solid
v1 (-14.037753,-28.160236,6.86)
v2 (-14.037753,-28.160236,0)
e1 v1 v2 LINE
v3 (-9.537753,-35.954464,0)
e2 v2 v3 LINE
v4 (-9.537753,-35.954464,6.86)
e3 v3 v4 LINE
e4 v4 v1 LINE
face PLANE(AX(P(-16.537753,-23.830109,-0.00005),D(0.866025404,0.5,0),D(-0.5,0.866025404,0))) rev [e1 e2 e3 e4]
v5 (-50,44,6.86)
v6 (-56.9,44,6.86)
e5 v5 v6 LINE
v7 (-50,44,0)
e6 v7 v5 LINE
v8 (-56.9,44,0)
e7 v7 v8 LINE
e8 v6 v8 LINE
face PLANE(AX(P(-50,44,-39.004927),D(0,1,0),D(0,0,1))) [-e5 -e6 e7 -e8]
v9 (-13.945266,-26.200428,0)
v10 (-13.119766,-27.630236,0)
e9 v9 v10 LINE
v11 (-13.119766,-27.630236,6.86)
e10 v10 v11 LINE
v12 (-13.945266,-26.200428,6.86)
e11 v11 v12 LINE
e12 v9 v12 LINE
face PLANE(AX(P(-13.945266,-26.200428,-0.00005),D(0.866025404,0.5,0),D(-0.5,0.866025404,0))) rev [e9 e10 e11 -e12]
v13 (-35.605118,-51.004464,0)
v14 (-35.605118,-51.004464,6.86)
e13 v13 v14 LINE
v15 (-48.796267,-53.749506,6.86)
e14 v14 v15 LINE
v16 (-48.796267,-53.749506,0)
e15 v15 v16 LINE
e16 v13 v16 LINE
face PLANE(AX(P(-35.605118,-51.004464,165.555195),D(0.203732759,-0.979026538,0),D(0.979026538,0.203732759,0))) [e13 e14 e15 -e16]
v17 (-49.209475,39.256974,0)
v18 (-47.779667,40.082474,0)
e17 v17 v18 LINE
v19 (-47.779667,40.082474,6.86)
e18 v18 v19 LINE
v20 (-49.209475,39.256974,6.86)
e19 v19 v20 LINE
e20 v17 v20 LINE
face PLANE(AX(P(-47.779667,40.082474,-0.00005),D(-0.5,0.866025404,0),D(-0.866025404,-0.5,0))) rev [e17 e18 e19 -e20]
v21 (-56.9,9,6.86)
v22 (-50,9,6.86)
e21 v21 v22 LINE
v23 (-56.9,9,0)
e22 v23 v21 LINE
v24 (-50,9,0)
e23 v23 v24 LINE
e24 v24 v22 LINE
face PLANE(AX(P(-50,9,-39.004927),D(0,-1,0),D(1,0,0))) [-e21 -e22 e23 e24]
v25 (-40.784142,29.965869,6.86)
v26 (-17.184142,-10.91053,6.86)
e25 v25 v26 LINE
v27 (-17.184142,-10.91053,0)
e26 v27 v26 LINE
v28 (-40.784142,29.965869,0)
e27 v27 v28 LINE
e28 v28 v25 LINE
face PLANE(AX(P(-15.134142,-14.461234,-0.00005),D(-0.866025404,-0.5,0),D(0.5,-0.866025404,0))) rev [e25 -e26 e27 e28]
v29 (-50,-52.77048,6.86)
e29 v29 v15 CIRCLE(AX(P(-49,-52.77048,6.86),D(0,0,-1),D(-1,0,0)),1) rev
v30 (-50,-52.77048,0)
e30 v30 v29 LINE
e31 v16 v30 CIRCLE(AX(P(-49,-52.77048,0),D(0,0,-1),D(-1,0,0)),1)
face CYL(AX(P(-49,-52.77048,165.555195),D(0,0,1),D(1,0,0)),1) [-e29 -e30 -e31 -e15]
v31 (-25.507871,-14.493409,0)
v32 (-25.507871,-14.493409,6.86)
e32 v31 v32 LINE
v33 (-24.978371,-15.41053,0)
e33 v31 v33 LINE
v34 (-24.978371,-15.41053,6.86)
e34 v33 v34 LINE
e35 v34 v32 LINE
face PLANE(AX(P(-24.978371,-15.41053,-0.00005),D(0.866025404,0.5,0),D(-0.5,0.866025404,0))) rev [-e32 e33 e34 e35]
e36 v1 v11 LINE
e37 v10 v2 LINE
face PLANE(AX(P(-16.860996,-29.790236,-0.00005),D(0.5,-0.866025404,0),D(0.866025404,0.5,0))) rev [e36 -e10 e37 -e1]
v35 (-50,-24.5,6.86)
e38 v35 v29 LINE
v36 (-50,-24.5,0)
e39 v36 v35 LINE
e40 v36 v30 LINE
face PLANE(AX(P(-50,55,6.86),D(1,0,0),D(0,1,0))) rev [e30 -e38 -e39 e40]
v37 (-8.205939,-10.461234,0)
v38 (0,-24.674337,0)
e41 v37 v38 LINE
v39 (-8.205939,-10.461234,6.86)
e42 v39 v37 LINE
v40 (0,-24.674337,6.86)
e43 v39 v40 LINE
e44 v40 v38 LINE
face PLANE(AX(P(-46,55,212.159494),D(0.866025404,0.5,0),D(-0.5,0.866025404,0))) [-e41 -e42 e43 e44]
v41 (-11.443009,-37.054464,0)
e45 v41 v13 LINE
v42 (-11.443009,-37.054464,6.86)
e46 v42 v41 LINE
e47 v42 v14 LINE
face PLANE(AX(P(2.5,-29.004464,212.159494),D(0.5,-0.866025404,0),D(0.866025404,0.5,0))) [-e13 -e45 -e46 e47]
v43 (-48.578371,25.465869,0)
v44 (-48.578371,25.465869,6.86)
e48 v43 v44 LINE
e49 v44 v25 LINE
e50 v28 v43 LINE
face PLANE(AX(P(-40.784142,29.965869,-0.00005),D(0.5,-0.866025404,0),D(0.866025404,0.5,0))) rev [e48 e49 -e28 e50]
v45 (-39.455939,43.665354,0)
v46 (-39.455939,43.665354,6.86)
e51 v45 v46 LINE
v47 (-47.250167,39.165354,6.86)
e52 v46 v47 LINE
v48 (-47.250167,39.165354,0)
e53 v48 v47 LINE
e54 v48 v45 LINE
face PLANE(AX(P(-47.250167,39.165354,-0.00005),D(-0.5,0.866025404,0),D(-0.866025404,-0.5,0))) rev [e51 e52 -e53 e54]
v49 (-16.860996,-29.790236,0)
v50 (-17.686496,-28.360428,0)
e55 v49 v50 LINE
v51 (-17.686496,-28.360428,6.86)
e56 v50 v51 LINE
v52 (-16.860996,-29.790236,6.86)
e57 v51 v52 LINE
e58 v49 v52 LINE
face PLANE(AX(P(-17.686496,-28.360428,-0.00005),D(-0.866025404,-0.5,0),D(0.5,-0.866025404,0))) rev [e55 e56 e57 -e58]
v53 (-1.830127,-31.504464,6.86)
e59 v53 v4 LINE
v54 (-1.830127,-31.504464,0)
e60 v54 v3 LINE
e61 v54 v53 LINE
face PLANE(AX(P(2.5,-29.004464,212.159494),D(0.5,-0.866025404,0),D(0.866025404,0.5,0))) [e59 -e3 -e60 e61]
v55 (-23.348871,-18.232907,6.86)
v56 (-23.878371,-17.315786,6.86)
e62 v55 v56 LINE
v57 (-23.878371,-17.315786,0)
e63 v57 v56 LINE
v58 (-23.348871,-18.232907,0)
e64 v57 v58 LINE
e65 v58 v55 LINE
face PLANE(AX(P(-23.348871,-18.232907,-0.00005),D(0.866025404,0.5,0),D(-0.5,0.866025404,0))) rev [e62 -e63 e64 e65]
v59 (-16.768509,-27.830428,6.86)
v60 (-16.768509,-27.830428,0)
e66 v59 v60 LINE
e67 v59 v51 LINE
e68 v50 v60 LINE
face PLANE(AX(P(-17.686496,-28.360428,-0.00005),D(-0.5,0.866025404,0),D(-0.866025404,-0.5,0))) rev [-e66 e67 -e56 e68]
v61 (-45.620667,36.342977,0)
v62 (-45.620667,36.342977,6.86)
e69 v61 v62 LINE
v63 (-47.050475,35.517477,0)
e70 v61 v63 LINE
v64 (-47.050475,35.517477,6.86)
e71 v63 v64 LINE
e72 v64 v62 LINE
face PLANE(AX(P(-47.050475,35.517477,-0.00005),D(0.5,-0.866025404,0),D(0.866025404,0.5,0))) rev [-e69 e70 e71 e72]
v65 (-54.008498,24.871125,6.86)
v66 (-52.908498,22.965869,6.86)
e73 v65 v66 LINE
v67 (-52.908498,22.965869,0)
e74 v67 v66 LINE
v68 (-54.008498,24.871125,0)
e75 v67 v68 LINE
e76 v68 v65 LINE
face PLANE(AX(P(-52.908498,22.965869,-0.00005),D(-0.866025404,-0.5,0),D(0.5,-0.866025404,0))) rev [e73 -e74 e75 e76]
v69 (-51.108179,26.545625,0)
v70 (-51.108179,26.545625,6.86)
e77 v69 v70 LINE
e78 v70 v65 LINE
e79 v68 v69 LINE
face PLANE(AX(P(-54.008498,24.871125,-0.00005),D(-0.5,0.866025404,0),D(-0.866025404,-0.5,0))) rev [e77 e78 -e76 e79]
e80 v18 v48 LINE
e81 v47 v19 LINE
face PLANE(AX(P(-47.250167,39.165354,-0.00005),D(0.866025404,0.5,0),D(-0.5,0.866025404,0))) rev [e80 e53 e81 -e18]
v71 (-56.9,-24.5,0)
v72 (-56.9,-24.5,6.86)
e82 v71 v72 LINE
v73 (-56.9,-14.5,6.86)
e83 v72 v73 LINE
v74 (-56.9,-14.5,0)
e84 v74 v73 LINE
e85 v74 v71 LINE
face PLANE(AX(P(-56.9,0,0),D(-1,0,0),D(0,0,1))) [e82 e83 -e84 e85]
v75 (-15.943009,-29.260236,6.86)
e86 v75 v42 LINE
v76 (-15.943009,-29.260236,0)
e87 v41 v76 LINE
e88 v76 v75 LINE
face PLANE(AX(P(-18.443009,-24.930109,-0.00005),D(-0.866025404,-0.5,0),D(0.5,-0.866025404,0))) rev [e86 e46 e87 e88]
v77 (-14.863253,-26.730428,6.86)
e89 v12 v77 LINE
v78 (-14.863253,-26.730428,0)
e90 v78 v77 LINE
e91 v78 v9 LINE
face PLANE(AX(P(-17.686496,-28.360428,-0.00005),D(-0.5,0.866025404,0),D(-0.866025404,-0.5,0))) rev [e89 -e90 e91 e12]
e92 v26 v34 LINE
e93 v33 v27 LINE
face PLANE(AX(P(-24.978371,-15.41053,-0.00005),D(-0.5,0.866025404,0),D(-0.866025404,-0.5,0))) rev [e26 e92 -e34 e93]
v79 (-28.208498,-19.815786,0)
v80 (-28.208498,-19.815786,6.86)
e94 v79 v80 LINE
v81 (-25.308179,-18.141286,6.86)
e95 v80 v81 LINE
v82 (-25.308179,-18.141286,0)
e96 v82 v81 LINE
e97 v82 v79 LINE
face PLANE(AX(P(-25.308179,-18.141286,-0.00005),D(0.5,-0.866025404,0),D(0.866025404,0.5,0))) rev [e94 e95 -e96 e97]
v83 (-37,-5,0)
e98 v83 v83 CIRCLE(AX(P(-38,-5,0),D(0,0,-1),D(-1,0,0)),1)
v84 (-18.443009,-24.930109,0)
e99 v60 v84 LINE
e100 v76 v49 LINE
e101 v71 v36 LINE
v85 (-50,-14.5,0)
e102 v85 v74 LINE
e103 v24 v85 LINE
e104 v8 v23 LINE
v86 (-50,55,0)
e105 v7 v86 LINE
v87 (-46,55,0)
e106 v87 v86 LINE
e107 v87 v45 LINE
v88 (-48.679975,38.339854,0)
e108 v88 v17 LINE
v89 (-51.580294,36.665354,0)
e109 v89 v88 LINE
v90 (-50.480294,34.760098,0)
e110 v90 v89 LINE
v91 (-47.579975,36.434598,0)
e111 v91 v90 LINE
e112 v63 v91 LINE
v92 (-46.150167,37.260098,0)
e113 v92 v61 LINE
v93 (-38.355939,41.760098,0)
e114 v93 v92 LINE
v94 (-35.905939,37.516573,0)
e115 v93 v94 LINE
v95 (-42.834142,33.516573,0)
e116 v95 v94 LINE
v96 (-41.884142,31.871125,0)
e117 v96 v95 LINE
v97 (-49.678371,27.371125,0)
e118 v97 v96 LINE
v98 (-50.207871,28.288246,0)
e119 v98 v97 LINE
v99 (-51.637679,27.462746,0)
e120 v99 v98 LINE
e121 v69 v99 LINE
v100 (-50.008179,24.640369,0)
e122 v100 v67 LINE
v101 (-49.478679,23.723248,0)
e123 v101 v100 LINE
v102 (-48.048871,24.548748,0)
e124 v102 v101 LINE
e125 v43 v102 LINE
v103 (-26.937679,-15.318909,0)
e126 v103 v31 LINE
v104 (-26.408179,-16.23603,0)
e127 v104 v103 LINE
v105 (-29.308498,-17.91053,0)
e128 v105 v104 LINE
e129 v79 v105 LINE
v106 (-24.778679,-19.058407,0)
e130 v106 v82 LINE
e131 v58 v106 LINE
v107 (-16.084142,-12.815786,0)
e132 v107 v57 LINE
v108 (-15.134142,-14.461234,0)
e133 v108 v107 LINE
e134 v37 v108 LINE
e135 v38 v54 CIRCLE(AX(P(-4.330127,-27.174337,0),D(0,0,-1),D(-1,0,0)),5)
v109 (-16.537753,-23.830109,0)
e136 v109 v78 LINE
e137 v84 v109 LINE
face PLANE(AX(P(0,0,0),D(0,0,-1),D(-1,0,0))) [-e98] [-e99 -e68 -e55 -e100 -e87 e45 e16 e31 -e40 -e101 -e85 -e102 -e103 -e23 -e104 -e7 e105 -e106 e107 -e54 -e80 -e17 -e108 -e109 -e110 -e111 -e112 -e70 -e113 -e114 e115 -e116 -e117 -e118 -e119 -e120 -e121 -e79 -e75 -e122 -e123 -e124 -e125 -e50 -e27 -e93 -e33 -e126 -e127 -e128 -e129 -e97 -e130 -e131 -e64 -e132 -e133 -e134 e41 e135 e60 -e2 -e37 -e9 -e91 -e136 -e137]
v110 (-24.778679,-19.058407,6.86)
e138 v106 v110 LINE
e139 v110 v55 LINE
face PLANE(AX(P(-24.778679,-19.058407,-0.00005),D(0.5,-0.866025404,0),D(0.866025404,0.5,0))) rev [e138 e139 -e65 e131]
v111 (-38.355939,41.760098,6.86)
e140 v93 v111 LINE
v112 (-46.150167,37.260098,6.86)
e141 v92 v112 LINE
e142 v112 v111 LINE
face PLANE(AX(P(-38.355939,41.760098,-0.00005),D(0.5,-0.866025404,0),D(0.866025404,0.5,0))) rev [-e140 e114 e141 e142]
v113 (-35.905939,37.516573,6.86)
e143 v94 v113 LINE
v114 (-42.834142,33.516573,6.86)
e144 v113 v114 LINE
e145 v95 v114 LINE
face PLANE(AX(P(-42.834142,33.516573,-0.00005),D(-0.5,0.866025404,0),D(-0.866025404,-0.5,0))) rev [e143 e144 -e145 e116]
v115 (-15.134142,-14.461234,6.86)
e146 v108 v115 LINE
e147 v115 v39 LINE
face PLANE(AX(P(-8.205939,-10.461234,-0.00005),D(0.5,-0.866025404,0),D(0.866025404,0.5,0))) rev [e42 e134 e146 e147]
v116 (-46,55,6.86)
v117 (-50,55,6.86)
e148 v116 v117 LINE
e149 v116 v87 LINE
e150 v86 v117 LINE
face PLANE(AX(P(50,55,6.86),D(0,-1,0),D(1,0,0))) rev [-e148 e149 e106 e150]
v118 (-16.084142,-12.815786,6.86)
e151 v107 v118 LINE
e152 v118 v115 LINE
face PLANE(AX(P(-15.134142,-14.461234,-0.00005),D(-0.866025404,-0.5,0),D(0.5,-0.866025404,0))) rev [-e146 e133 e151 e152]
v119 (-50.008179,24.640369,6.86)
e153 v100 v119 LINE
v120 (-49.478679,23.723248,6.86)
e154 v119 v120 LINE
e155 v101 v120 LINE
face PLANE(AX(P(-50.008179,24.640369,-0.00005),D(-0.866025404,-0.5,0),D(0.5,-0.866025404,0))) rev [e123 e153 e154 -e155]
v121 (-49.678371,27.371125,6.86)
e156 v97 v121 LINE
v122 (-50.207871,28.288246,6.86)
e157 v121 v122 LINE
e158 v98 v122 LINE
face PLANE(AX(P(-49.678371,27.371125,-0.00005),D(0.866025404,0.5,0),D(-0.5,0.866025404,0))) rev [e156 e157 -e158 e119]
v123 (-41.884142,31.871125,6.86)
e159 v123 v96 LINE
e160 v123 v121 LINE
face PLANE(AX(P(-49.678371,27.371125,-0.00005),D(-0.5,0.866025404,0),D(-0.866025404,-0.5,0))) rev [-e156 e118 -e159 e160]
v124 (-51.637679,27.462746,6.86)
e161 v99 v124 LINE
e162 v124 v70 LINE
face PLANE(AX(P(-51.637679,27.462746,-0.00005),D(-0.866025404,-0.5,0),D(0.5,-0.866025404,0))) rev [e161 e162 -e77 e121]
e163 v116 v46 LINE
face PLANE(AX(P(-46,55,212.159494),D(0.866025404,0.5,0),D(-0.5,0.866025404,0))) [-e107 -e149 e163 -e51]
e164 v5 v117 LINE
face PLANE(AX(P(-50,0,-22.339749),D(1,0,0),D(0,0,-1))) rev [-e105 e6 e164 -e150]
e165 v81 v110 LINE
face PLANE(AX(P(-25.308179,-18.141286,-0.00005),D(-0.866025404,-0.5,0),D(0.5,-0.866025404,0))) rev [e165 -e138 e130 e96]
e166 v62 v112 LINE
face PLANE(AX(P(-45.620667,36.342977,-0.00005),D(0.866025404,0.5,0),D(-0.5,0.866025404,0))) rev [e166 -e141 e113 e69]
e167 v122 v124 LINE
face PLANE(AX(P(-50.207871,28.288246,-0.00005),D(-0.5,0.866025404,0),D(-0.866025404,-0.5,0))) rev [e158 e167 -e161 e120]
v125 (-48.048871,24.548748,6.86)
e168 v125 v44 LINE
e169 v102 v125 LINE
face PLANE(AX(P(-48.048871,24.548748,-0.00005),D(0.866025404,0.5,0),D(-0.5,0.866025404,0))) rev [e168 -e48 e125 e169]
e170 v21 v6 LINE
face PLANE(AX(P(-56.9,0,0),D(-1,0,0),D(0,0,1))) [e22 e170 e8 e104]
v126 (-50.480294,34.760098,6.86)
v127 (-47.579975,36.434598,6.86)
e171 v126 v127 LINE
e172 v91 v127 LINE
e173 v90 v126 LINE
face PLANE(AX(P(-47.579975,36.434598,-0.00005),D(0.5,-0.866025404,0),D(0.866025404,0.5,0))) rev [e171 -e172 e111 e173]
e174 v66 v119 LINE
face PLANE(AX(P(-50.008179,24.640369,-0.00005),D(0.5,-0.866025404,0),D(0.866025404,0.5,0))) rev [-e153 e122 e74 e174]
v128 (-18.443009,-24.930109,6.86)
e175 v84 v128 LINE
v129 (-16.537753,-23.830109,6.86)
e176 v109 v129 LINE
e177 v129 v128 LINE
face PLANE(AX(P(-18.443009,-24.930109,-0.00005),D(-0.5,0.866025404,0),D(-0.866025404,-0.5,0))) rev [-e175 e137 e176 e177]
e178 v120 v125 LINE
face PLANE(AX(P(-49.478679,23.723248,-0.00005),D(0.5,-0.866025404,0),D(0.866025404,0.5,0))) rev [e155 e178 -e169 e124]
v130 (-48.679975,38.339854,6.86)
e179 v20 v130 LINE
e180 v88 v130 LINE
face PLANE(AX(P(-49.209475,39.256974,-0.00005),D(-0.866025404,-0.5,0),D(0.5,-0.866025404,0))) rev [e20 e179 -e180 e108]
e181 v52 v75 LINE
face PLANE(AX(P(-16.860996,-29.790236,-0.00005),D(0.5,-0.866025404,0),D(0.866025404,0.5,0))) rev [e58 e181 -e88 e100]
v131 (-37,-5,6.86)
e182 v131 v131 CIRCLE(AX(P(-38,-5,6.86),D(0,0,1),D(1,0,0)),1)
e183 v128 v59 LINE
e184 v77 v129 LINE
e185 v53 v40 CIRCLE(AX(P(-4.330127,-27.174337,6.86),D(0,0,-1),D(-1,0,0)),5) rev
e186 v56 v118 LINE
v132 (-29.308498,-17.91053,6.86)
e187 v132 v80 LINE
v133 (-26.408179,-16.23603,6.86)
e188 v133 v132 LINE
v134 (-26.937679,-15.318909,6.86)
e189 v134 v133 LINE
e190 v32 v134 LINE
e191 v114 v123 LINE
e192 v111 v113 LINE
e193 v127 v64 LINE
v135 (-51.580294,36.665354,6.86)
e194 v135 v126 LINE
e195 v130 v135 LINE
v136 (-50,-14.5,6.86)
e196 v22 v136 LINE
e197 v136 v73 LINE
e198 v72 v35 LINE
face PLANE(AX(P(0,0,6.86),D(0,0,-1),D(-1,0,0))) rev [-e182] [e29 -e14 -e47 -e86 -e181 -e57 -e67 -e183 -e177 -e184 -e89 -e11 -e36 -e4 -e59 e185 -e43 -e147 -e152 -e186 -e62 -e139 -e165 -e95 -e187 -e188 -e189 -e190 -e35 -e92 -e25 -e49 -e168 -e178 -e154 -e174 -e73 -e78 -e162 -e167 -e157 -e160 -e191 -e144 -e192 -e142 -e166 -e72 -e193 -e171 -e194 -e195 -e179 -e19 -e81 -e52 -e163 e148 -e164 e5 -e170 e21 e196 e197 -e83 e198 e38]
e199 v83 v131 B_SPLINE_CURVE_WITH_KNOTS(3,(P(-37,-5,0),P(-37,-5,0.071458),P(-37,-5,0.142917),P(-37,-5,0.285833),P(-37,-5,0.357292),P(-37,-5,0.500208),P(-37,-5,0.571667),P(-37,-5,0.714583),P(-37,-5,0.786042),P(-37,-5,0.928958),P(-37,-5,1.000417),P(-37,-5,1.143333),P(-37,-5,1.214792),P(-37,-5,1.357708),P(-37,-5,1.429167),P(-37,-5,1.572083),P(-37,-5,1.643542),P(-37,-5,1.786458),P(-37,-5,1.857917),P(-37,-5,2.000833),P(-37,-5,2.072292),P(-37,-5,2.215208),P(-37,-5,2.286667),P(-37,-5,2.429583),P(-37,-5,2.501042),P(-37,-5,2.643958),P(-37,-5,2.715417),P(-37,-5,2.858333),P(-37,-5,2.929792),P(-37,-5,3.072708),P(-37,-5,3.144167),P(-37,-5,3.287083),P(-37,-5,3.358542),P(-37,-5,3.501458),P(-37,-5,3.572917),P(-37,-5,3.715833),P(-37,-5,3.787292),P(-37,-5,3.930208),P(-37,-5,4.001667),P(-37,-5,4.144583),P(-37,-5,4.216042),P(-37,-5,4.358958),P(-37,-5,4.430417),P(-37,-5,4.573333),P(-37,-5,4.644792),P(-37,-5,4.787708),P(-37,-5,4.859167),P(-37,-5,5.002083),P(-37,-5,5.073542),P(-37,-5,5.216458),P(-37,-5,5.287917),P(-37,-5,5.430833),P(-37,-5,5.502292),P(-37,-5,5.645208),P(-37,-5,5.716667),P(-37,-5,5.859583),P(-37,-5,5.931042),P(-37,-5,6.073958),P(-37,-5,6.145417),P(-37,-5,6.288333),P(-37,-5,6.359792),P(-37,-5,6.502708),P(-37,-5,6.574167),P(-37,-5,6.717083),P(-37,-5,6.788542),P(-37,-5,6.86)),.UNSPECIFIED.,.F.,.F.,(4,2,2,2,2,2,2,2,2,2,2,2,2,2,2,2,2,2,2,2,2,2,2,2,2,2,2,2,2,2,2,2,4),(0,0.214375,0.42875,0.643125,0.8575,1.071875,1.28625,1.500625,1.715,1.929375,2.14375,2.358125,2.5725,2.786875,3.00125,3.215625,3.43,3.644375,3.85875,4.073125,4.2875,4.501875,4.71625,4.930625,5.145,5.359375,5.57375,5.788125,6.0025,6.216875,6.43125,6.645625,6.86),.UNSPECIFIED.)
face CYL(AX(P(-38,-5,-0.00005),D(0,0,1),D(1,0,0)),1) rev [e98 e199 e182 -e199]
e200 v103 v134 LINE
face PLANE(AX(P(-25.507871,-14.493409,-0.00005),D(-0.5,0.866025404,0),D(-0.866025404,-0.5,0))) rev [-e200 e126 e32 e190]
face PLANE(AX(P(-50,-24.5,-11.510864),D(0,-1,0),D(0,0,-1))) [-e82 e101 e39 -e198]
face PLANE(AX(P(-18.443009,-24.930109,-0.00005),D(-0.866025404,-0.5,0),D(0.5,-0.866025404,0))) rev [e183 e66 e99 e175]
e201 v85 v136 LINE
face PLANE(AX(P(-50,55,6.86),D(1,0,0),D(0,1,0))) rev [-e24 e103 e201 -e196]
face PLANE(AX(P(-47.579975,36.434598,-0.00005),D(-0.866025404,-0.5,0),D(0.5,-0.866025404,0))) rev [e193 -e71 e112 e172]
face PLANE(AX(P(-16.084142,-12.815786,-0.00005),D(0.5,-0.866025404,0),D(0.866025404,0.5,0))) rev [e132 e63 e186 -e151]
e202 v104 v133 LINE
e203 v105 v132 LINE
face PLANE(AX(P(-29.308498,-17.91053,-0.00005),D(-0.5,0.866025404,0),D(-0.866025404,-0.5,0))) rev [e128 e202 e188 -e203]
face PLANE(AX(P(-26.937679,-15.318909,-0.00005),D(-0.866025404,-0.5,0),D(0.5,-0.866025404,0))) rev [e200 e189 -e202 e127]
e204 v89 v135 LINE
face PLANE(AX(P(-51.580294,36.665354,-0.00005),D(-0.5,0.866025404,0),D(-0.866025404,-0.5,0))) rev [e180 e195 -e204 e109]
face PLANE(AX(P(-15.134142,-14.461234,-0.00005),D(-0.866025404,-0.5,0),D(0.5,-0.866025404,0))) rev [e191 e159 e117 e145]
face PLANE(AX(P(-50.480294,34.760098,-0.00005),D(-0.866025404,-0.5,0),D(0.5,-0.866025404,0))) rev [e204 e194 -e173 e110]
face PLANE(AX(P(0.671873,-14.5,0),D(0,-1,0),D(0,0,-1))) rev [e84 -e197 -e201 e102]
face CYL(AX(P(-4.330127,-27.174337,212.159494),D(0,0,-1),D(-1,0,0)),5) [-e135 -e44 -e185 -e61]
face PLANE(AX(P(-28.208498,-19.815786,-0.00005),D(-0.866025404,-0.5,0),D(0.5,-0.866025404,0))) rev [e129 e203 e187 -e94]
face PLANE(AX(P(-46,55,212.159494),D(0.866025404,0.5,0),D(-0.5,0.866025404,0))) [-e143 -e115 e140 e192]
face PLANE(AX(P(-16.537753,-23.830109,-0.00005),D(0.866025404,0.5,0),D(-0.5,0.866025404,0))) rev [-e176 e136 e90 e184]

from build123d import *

# Parameters (mm, degrees)
SKETCH1_W                = 100
SKETCH1_H                = 110
BOSS_EXTRUDE1_DEPTH      = 6.86
BOSS_EXTRUDE2_DEPTH      = 6.86
CUT_EXTRUDE1_DEPTH       = 84.419927529
CUT_EXTRUDE1_DEPTH_BACK  = 84.419927529
CUT_EXTRUDE5_DEPTH       = 84.419927529
CUT_EXTRUDE6_DEPTH       = 84.419927529
SKETCH7_W                = 42
SKETCH7_H                = 3.55
CUT_EXTRUDE7_DEPTH       = 84.419927529
SKETCH8_W                = 5
SKETCH8_H                = 7.62
CUT_EXTRUDE8_DEPTH       = 84.419927529
CUT_EXTRUDE9_DEPTH       = 84.419927529
LPATTERN1_COUNT          = 2
LPATTERN1_PITCH          = 49.4
SKETCH15_W               = 6.5
SKETCH15_H               = 9.5
BOSS_EXTRUDE3_DEPTH      = 6.86
CUT_EXTRUDE14_START      = -6.86
CUT_EXTRUDE14_DEPTH      = 6.86
BOSS_EXTRUDE4_DEPTH      = 6.86
FILLET3_R                = 5
FILLET4_R                = 7
CUT_EXTRUDE11_DEPTH      = 84.419927529
BOSS_EXTRUDE5_DEPTH      = 6.86
BOSS_EXTRUDE6_DEPTH      = 6.86
CUT_EXTRUDE12_DEPTH      = 84.419927529
CUT_EXTRUDE12_DEPTH_BACK = 84.419927529
SKETCH22_R               = 1
CUT_EXTRUDE13_DEPTH      = 84.419927529
CUT_EXTRUDE15_DEPTH      = 84.419927529
CUT_EXTRUDE15_DEPTH_BACK = 84.419927529
CUT_EXTRUDE16_DEPTH      = 84.419927529
CUT_EXTRUDE16_DEPTH_BACK = 84.419927529
FILLET2_R                = 1
BOSS_EXTRUDE8_START      = -6.86
BOSS_EXTRUDE8_DEPTH      = 6.86
CUT_EXTRUDE19_START      = -10
CUT_EXTRUDE19_DEPTH      = 10
SKETCH28_W               = 6.86
SKETCH28_H               = 9.5
SKETCH28_H_2             = 35
BOSS_EXTRUDE9_DEPTH      = 0.4
BOSS_EXTRUDE10_REACH     = 81.915
SKETCH29_W               = 6.86
SKETCH29_H               = 0.5
BOSS_EXTRUDE11_DEPTH     = 6.86


# Read off the part's stored shape, not the designer's step: Cut-Extrude14
with BuildPart() as part:
    # Sketch1 → Boss-Extrude1 (new body)
    with BuildSketch(Plane.XY):
        Rectangle(SKETCH1_W, SKETCH1_H)
    extrude(amount=BOSS_EXTRUDE1_DEPTH)

    # Sketch14 → Boss-Extrude2 (add)
    with BuildSketch(Plane.XY.offset(6.86)):
        with BuildLine():
            Line((-50, 44), (-56.9, 44))
            Line((-56.9, 44), (-57.252653961, 46))
            Line((-57.252653961, 46), (-60.252653961, 46))
            ThreePointArc((-60.252653961, 46), (-62.140394827, 27.177051725), (-56.9, 9))
            Line((-56.9, 9), (-50, 9))
            Line((-50, 9), (-50, 44))
        make_face()
    extrude(amount=-BOSS_EXTRUDE2_DEPTH)

    # Sketch9 → Cut-Extrude1 (cut, two sides: drawn at the far end of the back side and taken through both)
    with BuildSketch(Plane.XY.offset(6.86).offset(-CUT_EXTRUDE1_DEPTH_BACK)):
        Polygon((-202.691345573, 326.397371639), (-46, 55), (2.5, -29.004464167), (-49.825975731, -59.214880341), (-321.22334737, -215.906225914), (291.08659924, -349.739606366), (409.618601037, 192.563991188), align=None)
    extrude(amount=CUT_EXTRUDE1_DEPTH + CUT_EXTRUDE1_DEPTH_BACK, mode=Mode.SUBTRACT)

    # Sketch11 → Cut-Extrude5 (cut, through all)
    with BuildSketch(Plane.XY.offset(6.86)):
        Polygon((-35.90593882, 37.516573181), (-8.20593882, -10.461234188), (-15.13414205, -14.461234188), (-42.83414205, 33.516573181), align=None)
    extrude(amount=-CUT_EXTRUDE5_DEPTH, mode=Mode.SUBTRACT)

    # Sketch12 → Cut-Extrude6 (cut, through all)
    with BuildSketch(Plane.XY.offset(6.86)):
        Polygon((-18.88414205, -7.96604366), (-21.534179786, -9.49604366), (-35.534179786, 14.752667646), (-32.88414205, 16.282667646), align=None)
    extrude(amount=-CUT_EXTRUDE6_DEPTH, mode=Mode.SUBTRACT)

    # Sketch7 → Cut-Extrude7 (cut, through all)
    with BuildSketch(Plane.XY.offset(6.86)):
        with Locations((-50, -34)):
            Rectangle(SKETCH7_W, SKETCH7_H)
    extrude(amount=-CUT_EXTRUDE7_DEPTH, mode=Mode.SUBTRACT)

    # Sketch8 → Cut-Extrude8 (cut, through all)
    with BuildSketch(Plane.XY.offset(6.86)):
        with Locations((-36.5, -34)):
            Rectangle(SKETCH8_W, SKETCH8_H)
    extrude(amount=-CUT_EXTRUDE8_DEPTH, mode=Mode.SUBTRACT)

    # Sketch13 → Cut-Extrude9 (cut, through all)
    with BuildSketch(Plane.XY.offset(6.86)):
        Polygon((-41.88414205, 31.871124914), (-40.78414205, 29.965869026), (-48.578370684, 25.465869026), (-48.048870684, 24.548748123), (-49.478678626, 23.723248123), (-50.008178626, 24.640369026), (-52.908497703, 22.965869026), (-54.008497703, 24.871124914), (-51.108178626, 26.545624914), (-51.637678626, 27.462745817), (-50.207870684, 28.288245817), (-49.678370684, 27.371124914), align=None)
        Polygon((-39.45593882, 43.665353548), (-38.35593882, 41.76009766), (-46.150167454, 37.26009766), (-45.620667454, 36.342976757), (-47.050475396, 35.517476757), (-47.579975396, 36.43459766), (-50.480294473, 34.76009766), (-51.580294473, 36.665353548), (-48.679975396, 38.339853548), (-49.209475396, 39.256974451), (-47.779667454, 40.082474451), (-47.250167454, 39.165353548), align=None)
        Polygon((-18.443009001, -24.930108514), (-11.443009001, -37.054464167), (-9.537753113, -35.954464167), (-16.537753113, -23.830108514), align=None)
    cut_extrude9 = extrude(amount=-CUT_EXTRUDE9_DEPTH, mode=Mode.SUBTRACT)

    # LPattern1: Cut-Extrude9 ×2
    with Locations(*[Vector(0.49999999999999345, -0.8660254037844425, 0) * (i * LPATTERN1_PITCH) for i in range(1, LPATTERN1_COUNT)]):
        add(cut_extrude9, mode=Mode.SUBTRACT)

    # Sketch15 → Boss-Extrude3 (add)
    with BuildSketch(Plane.XY.offset(6.86)):
        with Locations((-53.25, -19.75)):
            Rectangle(SKETCH15_W, SKETCH15_H)
    extrude(amount=-BOSS_EXTRUDE3_DEPTH)

    # Cut-Extrude14 outline → Cut-Extrude14 (cut)
    with BuildSketch(Plane.XY.offset(6.86).offset(CUT_EXTRUDE14_START)):
        Polygon((-56.5, -15), (-56.5, -16.500643242), (-50, -15), align=None)
    extrude(amount=CUT_EXTRUDE14_DEPTH, mode=Mode.SUBTRACT)

    # Sketch16 → Boss-Extrude4 (add)
    with BuildSketch(Plane.XY.offset(6.86)):
        Polygon((-35.605117767, -51.004464167), (-34.105117767, -53.602540378), (-36.525588833, -55), (-42.525588833, -55), (-44.558274136, -51.479285778), align=None)
    extrude(amount=-BOSS_EXTRUDE4_DEPTH)

    # Fillet3
    fillet3_edges = [part.edges().sort_by_distance(p)[0] for p in [
        (2.5, -29.004464167, 3.43),
    ]]
    fillet(fillet3_edges, radius=FILLET3_R)

    # Fillet4
    fillet4_edges = [part.edges().sort_by_distance(p)[0] for p in [
        (-56.9, 9, 3.43),
    ]]
    fillet(fillet4_edges, radius=FILLET4_R)

    # Sketch18 → Cut-Extrude11 (cut, through all)
    with BuildSketch(Plane.XY.offset(6.86)):
        Polygon((-17.686495929, -28.360427591), (-13.945266185, -26.200427591), (-13.119766185, -27.630235533), (-16.860995929, -29.790235533), align=None)
    extrude(amount=-CUT_EXTRUDE11_DEPTH, mode=Mode.SUBTRACT)

    # Sketch19 → Boss-Extrude5 (add)
    with BuildSketch(Plane.XY.offset(6.86)):
        Polygon((-24.334179786, -4.646301399), (-23.234179786, -6.551557287), (-25.780294473, -8.021557287), (-26.880294473, -6.116301399), align=None)
    extrude(amount=-BOSS_EXTRUDE5_DEPTH)

    # Sketch20 → Boss-Extrude6 (add)
    with BuildSketch(Plane.XY.offset(6.86)):
        Polygon((-32.88414205, 16.282667646), (-18.88414205, -7.96604366), (-23.822038778, -10.816939665), (-37.822038778, 13.431771641), align=None)
    extrude(amount=-BOSS_EXTRUDE6_DEPTH)

    # Sketch21 → Cut-Extrude12 (cut, two sides: drawn at the far end of the back side and taken through both)
    with BuildSketch(Plane.XY.offset(6.86).offset(-CUT_EXTRUDE12_DEPTH_BACK)):
        Polygon((-50, 55), (-50, 44), (-48.060403212, 55), align=None)
    extrude(amount=CUT_EXTRUDE12_DEPTH + CUT_EXTRUDE12_DEPTH_BACK, mode=Mode.SUBTRACT)

    # Sketch22 → Cut-Extrude13 (cut, through all)
    with BuildSketch(Plane.XY.offset(6.86)):
        with Locations((-38, -5)):
            Circle(SKETCH22_R)
    extrude(amount=-CUT_EXTRUDE13_DEPTH, mode=Mode.SUBTRACT)

    # Sketch24 → Cut-Extrude15 (cut, two sides: drawn at the far end of the back side and taken through both)
    with BuildSketch(Plane.XY.offset(6.86).offset(-CUT_EXTRUDE15_DEPTH_BACK)):
        Polygon((207.425051562, 16.452548282), (-35.605117767, -51.004464167), (-50, -55), (-293.030169328, -122.457012449), (-158.11614443, -608.517351106), (342.33907646, -469.607790375), align=None)
    extrude(amount=CUT_EXTRUDE15_DEPTH + CUT_EXTRUDE15_DEPTH_BACK, mode=Mode.SUBTRACT)

    # Sketch26 → Cut-Extrude16 (cut, two sides: drawn at the far end of the back side and taken through both)
    with BuildSketch(Plane.XY.offset(6.86).offset(-CUT_EXTRUDE16_DEPTH_BACK)):
        Polygon((209.546353054, 0.01089), (-35.605117767, -51.004464167), (-50, -54), (-295.15147082, -105.015354167), (-193.120762486, -595.318295807), (311.577061387, -490.29205164), align=None)
    extrude(amount=CUT_EXTRUDE16_DEPTH + CUT_EXTRUDE16_DEPTH_BACK, mode=Mode.SUBTRACT)

    # Fillet2
    fillet2_edges = [part.edges().sort_by_distance(p)[0] for p in [
        (-60.252653961, 46, 3.43),
        (-56.5, -24.5, 3.43),
        (-56.5, -16.500643242, 3.43),
        (-50, -54, 3.43),
    ]]
    fillet(fillet2_edges, radius=FILLET2_R)

    # Sketch27 → Boss-Extrude8 (add)
    with BuildSketch(Plane.XY.offset(6.86).offset(BOSS_EXTRUDE8_START)):
        with BuildLine():
            Line((-55.724951054, -16.321709094), (-50, -15))
            Line((-50, -15), (-56.5, -15))
            Line((-56.5, -15), (-56.5, -17.296079159))
            ThreePointArc((-56.5, -17.296079159), (-56.282608157, -16.673564522), (-55.724951054, -16.321709094))
        make_face()
        with BuildLine():
            ThreePointArc((-52.380008746, 9), (-54.54635817, 9.343654894), (-56.5, 10.340877094))
            Line((-56.5, 10.340877094), (-56.5, 9))
            Line((-56.5, 9), (-52.380008746, 9))
        make_face()
        with BuildLine():
            Line((-56.5, -24.5), (-55.5, -24.5))
            ThreePointArc((-55.5, -24.5), (-56.207106781, -24.207106781), (-56.5, -23.5))
            Line((-56.5, -23.5), (-56.5, -24.5))
        make_face()
    extrude(amount=BOSS_EXTRUDE8_DEPTH)

    # Sketch27<5> → Cut-Extrude19 (cut)
    with BuildSketch(Plane.XY.offset(6.86).offset(CUT_EXTRUDE19_START)):
        with BuildLine():
            Line((-56.5, 10.340877094), (-56.5, 44))
            Line((-56.5, 44), (-56.9, 44))
            Line((-56.9, 44), (-57.252653961, 46))
            Line((-57.252653961, 46), (-59.50182182, 46))
            ThreePointArc((-59.50182182, 46), (-60.105291207, 45.797386167), (-60.464218102, 45.271649399))
            ThreePointArc((-60.464218102, 45.271649399), (-62.283923616, 29.230647449), (-58.897432775, 13.445947531))
            ThreePointArc((-58.897432775, 13.445947531), (-57.920678072, 11.722035132), (-56.5, 10.340877094))
        make_face()
    extrude(amount=CUT_EXTRUDE19_DEPTH, mode=Mode.SUBTRACT)

    # Sketch28 → Boss-Extrude9 (add)
    with BuildSketch(Plane.ZY.offset(56.5)):
        with Locations((3.43, -19.75)):
            Rectangle(SKETCH28_W, SKETCH28_H)
        with Locations((3.43, 26.5)):
            Rectangle(SKETCH28_W, SKETCH28_H_2)
    extrude(amount=BOSS_EXTRUDE9_DEPTH)

    # Sketch29 → Boss-Extrude10 (add, up to next)
    with BuildSketch(Plane.ZY.offset(56.9), mode=Mode.PRIVATE) as boss_extrude10_sk1:
        with Locations((3.43, -14.75)):
            Rectangle(SKETCH29_W, SKETCH29_H)
    boss_extrude10_tool1 = extrude(boss_extrude10_sk1.sketch, amount=-BOSS_EXTRUDE10_REACH, mode=Mode.PRIVATE) - part.part
    add(boss_extrude10_tool1.solids().sort_by_distance((-56.9, -14.75, 3.43))[0])

    # Sketch30 → Boss-Extrude11 (add)
    with BuildSketch(Plane.XY.offset(6.86)):
        Polygon((-39, -32.225), (-50, -32.225), (-50, -35.775), (-39, -35.775), (-39, -37.81), (-34, -37.81), (-34, -35.775), (-29, -35.775), (-29, -32.225), (-34, -32.225), (-34, -30.19), (-39, -30.19), align=None)
        Polygon((-50, 55), (-48.060403212, 55), (-50, 44), align=None)
    extrude(amount=-BOSS_EXTRUDE11_DEPTH)


solid = part.part
